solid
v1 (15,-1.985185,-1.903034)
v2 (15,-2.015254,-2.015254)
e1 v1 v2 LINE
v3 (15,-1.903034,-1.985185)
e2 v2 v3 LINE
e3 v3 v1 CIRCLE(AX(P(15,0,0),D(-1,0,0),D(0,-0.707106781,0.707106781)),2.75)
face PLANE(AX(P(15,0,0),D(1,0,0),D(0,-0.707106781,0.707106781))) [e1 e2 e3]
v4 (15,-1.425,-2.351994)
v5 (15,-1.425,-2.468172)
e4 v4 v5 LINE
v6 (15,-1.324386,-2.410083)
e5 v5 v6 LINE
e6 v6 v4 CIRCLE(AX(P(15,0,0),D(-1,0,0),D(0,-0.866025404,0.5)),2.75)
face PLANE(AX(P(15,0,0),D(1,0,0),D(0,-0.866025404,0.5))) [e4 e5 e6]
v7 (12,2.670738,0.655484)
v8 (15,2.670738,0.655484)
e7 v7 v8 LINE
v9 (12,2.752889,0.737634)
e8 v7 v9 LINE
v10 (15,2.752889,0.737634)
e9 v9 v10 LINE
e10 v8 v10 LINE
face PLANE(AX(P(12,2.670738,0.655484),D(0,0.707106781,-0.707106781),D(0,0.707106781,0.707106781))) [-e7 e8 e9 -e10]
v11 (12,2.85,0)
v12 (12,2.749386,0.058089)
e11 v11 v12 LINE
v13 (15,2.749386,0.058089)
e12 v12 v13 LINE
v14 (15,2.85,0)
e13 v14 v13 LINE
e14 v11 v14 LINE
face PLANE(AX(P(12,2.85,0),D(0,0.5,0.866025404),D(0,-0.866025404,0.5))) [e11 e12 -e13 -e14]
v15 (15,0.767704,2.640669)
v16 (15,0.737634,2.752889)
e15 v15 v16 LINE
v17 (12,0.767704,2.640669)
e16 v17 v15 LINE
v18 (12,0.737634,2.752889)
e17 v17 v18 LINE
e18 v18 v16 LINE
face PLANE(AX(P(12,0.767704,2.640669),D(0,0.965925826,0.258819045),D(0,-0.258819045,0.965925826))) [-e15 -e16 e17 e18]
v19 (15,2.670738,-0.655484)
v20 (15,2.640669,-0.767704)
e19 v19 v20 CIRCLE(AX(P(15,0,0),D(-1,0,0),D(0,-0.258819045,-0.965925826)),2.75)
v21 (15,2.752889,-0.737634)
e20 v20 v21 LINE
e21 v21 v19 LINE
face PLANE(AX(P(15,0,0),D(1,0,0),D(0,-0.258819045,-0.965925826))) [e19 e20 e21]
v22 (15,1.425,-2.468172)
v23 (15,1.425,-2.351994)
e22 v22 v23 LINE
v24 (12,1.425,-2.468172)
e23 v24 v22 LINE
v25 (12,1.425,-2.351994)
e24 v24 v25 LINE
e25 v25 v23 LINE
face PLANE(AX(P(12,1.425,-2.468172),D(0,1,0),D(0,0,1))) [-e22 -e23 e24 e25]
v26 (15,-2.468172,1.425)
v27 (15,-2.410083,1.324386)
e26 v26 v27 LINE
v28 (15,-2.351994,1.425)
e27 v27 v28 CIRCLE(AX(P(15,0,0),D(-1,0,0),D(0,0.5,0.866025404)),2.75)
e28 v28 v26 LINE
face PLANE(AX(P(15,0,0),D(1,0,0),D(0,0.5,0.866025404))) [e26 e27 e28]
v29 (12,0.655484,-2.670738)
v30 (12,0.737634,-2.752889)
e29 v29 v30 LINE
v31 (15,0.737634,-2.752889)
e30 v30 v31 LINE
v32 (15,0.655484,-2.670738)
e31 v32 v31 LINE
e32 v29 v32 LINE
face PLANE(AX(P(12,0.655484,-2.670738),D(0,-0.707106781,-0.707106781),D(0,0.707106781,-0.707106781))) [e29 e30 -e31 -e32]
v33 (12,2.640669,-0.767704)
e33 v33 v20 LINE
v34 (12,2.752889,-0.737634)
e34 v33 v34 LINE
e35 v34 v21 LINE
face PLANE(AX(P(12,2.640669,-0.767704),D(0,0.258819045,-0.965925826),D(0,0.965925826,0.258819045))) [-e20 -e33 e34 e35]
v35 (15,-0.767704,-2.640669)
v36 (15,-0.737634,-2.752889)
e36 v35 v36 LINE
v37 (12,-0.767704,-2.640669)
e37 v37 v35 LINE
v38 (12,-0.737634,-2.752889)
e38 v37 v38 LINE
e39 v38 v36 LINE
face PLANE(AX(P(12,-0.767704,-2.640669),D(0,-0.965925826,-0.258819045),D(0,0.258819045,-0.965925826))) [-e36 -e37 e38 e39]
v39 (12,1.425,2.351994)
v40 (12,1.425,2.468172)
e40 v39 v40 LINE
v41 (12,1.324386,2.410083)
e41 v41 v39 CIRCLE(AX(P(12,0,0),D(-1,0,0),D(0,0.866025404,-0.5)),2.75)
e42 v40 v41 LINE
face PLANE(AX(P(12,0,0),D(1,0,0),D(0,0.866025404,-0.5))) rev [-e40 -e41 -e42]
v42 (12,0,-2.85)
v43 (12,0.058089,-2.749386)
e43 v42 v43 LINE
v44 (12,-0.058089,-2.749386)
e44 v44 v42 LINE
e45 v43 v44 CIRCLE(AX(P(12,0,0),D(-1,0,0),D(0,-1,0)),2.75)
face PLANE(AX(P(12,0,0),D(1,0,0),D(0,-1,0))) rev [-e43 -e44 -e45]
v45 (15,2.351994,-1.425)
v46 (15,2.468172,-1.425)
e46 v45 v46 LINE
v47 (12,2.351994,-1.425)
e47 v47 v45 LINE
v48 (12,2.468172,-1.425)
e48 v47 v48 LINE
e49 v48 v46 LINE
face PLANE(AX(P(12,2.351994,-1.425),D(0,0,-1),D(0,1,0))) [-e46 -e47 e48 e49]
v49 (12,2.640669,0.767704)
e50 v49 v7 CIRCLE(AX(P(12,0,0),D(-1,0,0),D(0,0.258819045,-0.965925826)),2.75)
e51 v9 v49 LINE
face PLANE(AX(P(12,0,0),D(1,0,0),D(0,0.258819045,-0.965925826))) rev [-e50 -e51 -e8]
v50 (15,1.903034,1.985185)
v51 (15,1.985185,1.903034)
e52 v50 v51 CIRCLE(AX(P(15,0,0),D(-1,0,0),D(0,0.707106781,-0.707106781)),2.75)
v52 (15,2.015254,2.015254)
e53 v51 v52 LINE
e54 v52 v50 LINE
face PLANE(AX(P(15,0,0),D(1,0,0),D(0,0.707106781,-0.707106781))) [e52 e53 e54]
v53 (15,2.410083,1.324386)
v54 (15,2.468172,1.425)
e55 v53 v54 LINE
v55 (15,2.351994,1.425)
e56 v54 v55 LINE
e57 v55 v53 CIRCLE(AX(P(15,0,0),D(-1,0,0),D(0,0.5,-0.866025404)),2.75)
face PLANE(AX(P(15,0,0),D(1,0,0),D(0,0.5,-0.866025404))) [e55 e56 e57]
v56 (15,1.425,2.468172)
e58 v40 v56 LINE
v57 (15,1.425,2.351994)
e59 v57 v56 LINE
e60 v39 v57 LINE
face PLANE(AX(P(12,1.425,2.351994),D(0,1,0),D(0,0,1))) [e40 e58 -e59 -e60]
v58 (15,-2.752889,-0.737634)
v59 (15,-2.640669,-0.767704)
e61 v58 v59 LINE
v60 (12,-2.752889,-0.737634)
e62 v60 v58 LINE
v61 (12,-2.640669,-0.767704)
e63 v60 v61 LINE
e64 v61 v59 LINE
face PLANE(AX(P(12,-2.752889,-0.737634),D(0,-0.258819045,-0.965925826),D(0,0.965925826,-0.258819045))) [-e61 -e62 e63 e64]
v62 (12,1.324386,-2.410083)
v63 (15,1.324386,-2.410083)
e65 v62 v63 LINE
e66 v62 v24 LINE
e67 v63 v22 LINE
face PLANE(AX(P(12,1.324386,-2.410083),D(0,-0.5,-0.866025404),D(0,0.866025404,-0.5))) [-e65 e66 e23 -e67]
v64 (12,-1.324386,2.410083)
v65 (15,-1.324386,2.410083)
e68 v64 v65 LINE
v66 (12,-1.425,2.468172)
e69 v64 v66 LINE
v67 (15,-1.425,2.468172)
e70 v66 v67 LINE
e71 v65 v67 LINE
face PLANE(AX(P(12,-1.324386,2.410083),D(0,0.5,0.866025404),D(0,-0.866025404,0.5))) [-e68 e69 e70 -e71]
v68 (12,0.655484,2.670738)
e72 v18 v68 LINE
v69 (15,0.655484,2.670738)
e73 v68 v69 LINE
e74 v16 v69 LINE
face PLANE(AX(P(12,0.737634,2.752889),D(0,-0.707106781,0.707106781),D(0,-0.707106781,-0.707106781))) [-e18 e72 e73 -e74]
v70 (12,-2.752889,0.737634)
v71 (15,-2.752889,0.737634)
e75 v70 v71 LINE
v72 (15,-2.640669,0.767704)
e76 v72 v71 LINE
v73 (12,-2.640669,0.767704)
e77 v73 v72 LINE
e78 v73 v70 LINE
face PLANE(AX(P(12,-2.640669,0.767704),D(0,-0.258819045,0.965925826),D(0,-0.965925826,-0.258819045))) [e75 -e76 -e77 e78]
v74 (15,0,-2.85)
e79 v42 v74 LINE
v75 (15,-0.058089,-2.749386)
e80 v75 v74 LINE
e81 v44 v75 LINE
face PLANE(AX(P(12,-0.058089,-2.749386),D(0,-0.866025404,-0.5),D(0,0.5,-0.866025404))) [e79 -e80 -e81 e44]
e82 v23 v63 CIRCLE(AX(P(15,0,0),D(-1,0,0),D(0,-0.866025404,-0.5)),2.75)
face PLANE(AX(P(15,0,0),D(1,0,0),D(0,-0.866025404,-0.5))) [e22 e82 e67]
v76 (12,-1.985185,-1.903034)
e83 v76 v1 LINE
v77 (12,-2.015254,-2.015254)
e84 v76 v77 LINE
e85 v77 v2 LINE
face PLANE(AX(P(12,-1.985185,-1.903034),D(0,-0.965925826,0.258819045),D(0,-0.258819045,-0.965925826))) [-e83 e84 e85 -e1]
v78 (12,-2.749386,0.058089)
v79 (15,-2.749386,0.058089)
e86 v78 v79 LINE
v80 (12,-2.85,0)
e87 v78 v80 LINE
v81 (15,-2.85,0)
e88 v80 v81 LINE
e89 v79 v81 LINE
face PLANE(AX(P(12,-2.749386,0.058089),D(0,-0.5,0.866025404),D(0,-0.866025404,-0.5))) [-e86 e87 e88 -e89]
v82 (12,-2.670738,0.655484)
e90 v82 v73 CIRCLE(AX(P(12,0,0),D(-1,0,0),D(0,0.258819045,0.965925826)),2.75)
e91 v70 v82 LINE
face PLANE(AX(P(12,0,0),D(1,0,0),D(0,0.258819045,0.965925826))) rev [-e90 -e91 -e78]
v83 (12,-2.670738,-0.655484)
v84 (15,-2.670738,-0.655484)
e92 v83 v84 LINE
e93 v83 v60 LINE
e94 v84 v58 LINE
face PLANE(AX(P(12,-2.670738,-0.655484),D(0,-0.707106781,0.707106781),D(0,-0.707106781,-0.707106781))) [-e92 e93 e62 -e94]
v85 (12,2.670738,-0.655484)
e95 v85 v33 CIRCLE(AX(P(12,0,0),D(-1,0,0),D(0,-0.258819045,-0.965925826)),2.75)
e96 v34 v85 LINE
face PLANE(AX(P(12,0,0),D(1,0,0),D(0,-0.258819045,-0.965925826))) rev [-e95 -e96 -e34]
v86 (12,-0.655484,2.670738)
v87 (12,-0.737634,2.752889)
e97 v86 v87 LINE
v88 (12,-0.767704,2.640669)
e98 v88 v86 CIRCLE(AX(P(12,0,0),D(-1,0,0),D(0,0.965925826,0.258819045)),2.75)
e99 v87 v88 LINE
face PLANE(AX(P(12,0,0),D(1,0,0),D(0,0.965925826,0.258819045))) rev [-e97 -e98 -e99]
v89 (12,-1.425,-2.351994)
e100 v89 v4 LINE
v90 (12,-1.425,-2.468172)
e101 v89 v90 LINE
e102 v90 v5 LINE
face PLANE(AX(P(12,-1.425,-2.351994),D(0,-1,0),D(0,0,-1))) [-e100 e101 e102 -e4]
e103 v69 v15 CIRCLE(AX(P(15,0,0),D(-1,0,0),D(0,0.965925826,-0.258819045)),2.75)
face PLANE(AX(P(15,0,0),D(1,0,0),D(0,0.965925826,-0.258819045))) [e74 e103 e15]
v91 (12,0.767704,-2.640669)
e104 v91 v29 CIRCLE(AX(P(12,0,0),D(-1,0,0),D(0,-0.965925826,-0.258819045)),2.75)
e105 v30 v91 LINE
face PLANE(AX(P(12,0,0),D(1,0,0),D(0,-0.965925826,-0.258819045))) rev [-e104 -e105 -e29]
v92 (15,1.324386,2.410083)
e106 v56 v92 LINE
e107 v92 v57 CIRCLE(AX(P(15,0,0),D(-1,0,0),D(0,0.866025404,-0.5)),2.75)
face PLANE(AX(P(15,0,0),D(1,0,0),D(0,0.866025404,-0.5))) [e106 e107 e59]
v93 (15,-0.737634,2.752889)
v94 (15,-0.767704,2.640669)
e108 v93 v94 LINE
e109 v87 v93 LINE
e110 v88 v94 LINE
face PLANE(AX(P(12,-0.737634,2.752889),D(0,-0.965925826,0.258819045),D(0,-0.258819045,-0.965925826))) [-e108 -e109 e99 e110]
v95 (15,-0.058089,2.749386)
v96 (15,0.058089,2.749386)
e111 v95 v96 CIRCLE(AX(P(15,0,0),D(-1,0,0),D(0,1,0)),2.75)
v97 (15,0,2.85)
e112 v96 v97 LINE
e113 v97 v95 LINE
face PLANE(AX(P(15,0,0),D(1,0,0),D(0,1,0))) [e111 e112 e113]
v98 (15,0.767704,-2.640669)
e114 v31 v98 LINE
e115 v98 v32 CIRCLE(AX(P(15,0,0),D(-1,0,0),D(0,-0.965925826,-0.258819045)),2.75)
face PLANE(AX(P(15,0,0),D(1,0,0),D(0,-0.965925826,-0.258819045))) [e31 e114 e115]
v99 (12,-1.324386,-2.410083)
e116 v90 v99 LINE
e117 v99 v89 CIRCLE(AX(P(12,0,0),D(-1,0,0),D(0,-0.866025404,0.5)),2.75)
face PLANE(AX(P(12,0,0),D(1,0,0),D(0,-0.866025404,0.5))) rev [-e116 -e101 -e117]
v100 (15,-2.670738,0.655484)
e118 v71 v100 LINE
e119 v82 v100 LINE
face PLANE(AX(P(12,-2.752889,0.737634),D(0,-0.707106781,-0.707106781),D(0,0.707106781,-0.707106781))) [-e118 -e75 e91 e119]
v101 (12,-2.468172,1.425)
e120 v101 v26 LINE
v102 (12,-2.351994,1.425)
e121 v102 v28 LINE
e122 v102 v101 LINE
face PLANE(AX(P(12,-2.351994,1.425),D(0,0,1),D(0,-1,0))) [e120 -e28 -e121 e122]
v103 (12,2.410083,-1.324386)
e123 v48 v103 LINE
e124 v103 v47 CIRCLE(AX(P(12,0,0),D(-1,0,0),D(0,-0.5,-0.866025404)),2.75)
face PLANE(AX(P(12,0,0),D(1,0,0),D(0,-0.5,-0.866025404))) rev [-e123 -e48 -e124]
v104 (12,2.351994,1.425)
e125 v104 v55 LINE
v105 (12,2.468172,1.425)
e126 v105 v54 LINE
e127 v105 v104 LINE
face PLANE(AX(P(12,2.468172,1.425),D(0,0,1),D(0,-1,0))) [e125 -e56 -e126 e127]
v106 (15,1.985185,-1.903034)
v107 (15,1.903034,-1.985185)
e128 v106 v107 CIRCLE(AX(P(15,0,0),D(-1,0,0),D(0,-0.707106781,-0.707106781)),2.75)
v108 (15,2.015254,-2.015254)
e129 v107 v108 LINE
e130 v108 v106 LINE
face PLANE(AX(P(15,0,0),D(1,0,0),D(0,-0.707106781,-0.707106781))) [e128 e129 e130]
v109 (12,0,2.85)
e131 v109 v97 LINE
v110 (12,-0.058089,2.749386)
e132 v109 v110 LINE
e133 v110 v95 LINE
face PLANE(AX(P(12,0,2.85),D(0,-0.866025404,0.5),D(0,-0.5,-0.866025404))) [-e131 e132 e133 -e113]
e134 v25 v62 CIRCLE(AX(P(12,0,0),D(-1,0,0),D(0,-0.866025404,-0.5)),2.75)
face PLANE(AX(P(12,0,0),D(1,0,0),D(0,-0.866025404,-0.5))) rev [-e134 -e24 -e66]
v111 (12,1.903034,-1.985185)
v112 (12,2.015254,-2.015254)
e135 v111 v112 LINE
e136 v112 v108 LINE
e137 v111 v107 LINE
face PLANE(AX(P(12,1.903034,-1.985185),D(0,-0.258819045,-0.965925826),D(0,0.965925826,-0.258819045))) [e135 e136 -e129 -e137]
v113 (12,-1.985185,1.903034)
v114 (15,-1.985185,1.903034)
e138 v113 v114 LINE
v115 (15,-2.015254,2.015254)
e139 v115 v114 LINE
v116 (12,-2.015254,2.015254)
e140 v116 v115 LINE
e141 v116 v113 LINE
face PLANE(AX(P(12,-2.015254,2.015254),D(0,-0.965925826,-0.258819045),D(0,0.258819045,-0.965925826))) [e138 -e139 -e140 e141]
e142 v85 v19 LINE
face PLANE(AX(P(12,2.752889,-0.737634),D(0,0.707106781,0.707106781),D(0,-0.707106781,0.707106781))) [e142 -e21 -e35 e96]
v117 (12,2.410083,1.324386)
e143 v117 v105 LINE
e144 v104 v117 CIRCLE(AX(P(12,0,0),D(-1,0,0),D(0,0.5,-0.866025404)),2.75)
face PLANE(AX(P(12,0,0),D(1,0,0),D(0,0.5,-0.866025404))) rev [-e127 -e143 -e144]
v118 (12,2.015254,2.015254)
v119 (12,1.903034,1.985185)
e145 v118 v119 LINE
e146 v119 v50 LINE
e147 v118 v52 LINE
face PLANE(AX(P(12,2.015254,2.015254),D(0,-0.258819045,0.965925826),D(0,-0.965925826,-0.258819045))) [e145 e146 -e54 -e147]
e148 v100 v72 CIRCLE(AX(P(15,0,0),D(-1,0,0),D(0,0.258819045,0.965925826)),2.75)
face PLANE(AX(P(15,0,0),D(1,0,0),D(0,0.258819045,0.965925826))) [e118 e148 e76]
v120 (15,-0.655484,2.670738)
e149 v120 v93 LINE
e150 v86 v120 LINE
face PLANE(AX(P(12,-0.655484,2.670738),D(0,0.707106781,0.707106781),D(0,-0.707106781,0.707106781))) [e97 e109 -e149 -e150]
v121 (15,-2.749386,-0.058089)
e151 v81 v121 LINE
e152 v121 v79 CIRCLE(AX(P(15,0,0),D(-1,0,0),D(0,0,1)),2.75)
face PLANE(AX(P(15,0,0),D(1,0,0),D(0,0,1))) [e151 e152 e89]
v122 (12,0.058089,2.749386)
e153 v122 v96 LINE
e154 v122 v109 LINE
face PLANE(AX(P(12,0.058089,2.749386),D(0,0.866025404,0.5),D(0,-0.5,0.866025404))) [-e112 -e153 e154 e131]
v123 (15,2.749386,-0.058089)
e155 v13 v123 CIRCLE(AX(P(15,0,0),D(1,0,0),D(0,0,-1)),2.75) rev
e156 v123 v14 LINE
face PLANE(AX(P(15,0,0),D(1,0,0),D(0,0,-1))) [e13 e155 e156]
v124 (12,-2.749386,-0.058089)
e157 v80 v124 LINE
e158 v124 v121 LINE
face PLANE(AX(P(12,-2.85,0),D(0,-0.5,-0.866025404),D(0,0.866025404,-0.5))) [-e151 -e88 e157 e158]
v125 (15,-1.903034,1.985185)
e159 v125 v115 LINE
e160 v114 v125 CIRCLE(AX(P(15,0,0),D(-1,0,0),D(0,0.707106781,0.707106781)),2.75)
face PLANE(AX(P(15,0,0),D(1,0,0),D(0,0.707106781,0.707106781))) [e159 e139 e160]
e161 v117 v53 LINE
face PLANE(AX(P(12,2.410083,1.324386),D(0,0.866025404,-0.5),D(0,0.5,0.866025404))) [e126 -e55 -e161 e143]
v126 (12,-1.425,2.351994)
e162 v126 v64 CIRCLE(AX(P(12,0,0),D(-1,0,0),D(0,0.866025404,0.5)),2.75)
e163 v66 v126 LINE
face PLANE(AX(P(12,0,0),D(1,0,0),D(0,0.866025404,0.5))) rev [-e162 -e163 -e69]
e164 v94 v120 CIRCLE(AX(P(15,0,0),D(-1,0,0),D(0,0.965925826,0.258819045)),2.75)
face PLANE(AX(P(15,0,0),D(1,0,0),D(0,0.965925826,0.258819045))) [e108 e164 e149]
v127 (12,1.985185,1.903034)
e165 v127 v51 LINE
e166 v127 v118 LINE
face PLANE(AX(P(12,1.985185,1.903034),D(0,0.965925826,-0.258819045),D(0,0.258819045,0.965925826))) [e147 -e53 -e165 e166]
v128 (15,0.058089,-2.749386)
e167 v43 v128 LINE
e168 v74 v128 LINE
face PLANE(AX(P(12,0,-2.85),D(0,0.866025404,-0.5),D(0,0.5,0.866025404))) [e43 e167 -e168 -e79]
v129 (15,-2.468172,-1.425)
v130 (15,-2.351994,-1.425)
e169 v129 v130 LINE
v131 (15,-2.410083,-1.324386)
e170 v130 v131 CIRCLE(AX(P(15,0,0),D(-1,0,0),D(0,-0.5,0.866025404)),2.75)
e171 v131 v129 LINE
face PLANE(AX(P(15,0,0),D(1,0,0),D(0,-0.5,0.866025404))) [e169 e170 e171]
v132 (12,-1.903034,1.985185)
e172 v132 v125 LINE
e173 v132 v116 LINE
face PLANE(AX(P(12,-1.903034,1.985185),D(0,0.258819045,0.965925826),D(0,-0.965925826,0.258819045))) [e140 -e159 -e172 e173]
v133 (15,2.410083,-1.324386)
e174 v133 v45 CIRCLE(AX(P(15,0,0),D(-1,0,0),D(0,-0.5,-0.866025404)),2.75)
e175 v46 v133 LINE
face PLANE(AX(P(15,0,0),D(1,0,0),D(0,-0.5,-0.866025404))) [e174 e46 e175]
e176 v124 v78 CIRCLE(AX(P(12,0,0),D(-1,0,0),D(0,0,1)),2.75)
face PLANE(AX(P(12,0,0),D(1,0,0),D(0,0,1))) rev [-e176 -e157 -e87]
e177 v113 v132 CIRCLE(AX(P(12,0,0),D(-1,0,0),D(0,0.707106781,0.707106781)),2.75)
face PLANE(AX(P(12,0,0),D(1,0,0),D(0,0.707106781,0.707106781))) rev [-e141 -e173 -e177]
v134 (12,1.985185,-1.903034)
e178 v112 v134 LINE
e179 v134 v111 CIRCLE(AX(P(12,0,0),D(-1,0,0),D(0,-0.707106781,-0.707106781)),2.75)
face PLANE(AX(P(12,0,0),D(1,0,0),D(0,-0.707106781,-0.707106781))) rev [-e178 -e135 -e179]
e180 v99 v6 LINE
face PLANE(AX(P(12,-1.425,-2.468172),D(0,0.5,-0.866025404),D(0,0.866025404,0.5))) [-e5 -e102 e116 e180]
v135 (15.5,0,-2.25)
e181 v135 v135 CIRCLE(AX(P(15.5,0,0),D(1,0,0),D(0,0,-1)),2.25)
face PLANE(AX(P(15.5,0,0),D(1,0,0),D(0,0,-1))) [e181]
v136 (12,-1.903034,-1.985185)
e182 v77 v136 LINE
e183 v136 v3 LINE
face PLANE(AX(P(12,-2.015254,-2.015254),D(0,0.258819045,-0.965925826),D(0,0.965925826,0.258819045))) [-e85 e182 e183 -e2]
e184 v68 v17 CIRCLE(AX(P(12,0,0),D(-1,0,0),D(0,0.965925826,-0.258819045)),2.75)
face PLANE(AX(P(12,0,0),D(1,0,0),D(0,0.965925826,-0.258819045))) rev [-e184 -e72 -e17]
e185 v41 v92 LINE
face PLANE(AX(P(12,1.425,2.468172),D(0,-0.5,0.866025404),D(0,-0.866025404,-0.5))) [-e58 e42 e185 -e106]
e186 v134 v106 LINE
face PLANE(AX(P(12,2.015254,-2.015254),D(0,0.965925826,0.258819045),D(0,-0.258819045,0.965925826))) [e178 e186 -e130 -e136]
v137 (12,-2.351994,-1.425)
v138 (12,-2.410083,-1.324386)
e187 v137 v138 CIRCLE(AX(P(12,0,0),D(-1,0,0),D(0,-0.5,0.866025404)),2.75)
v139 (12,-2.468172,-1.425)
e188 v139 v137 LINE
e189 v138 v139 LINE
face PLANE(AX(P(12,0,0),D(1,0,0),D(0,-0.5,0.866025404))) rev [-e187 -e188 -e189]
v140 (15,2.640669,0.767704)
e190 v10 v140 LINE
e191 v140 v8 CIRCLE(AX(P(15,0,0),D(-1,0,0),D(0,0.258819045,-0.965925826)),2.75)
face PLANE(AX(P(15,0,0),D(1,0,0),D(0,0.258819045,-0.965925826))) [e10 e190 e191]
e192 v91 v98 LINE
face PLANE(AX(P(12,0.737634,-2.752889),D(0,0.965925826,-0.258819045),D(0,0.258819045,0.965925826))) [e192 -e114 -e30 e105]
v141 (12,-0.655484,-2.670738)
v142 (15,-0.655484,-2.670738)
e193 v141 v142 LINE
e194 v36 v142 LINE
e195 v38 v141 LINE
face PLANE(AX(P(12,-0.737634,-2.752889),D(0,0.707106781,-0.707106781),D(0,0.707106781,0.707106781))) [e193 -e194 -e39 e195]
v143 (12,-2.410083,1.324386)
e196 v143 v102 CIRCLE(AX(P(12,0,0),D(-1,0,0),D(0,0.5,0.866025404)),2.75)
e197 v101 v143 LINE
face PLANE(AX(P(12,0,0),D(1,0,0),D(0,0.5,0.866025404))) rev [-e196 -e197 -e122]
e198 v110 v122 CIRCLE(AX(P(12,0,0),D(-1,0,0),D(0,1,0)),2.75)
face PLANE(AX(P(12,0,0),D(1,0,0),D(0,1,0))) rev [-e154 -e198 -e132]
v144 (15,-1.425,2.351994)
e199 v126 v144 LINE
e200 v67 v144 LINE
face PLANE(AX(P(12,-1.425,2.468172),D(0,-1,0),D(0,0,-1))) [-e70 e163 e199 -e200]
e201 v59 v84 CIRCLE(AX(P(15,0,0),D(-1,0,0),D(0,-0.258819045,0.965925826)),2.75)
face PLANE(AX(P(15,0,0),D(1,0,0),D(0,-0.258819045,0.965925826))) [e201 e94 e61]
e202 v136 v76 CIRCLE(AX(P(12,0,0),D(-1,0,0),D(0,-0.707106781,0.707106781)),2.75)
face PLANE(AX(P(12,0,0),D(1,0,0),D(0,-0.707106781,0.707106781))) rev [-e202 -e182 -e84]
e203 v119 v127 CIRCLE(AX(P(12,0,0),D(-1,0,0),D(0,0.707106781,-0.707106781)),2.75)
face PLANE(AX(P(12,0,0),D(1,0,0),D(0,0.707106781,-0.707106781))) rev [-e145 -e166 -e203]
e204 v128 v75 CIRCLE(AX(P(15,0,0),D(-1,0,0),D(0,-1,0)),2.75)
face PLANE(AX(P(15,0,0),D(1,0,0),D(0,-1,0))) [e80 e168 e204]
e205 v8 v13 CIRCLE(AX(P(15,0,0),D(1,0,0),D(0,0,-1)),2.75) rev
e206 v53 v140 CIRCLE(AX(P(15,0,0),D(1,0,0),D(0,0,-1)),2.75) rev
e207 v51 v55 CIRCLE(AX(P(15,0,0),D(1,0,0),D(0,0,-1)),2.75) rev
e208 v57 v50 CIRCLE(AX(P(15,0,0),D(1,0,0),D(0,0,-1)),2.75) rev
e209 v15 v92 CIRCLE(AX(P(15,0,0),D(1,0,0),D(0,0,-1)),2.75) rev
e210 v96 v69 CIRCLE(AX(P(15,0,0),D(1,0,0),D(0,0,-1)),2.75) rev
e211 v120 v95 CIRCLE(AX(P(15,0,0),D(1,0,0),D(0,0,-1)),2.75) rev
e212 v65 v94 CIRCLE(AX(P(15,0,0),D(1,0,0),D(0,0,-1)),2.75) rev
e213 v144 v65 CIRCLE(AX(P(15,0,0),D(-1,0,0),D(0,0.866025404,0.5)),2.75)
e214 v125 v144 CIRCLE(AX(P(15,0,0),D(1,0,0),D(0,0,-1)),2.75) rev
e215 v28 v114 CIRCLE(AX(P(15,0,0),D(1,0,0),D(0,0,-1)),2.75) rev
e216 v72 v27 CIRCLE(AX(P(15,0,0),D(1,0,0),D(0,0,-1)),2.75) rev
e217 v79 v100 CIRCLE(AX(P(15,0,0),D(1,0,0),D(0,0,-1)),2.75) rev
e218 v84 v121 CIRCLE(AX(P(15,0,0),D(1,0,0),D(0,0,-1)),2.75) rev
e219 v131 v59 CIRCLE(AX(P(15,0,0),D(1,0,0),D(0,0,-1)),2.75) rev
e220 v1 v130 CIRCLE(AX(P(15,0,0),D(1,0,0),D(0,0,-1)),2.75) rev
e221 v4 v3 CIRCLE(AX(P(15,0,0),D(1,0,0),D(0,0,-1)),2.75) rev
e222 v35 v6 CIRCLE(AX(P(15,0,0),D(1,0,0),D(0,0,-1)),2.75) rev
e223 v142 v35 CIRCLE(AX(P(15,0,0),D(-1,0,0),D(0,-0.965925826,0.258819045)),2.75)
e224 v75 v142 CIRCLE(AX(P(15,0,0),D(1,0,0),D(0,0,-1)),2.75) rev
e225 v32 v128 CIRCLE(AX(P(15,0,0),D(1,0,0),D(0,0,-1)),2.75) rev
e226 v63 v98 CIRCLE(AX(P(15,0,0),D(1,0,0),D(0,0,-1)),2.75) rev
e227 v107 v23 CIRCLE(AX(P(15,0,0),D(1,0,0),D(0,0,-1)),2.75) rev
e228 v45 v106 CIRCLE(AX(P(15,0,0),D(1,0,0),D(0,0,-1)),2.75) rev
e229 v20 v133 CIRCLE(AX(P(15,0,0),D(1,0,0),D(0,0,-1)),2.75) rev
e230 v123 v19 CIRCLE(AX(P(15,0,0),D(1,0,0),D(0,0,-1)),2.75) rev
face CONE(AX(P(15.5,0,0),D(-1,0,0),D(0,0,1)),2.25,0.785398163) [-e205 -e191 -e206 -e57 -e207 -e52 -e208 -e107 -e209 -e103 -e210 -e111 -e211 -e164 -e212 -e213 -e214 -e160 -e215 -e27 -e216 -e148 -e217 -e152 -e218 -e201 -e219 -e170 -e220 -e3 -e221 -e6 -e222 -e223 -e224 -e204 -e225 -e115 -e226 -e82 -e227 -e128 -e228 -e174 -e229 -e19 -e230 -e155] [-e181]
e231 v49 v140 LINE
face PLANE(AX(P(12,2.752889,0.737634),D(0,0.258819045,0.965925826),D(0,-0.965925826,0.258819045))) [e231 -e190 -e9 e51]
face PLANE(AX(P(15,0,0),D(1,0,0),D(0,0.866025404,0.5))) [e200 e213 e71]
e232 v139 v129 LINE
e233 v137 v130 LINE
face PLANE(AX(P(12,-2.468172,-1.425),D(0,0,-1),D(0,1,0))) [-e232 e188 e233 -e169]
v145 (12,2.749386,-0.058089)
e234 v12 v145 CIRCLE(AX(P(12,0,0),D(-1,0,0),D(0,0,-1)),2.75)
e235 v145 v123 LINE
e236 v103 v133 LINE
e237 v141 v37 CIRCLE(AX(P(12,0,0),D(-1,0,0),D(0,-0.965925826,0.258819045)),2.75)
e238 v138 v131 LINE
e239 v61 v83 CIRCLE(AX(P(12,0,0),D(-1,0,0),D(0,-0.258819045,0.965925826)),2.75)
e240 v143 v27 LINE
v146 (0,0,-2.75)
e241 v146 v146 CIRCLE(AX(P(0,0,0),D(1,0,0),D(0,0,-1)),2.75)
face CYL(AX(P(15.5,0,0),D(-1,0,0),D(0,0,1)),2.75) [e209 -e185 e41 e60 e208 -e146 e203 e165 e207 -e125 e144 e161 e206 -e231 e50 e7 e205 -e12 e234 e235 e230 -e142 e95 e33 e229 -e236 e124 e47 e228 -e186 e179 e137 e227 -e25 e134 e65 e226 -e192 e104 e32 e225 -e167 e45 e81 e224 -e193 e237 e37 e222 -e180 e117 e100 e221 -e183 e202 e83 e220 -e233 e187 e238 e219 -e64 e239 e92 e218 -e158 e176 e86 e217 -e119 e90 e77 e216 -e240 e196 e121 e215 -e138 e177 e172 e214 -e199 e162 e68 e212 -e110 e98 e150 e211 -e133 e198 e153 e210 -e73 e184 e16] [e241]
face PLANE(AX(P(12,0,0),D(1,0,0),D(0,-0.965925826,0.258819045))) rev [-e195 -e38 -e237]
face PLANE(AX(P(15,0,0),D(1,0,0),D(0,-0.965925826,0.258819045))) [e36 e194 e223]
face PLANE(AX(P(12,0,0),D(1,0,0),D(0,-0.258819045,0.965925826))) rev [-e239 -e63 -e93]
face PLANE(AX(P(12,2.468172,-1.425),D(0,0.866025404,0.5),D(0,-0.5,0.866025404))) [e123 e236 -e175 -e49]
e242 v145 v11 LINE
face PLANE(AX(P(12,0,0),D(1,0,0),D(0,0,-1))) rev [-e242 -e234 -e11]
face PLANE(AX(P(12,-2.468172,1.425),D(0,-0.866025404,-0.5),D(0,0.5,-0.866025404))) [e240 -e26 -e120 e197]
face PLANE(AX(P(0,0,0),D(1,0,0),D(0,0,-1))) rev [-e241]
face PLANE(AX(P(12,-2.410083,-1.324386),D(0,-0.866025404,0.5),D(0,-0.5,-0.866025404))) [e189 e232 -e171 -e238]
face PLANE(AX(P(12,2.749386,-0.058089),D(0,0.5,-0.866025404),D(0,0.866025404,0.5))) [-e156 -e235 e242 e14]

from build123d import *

# Parameters (mm, degrees)
SKETCH1_R           = 2.75
BOSS_EXTRUDE1_DEPTH = 15.5
CHAMFER1_SIZE       = 0.5
BOSS_EXTRUDE2_START = -3
BOSS_EXTRUDE2_DEPTH = 3
CIRPATTERN1_START   = 12
CIRPATTERN1_DEPTH   = 3


# Read off the part's stored shape, not the designer's step: CirPattern1
with BuildPart() as part:
    # Sketch1 → Boss-Extrude1 (new body)
    with BuildSketch(Plane(origin=(0, 0, 0), x_dir=(0, 0, -1), z_dir=(1, 0, 0))):
        Circle(SKETCH1_R)
    extrude(amount=BOSS_EXTRUDE1_DEPTH)

    # Chamfer1
    chamfer1_edges = [part.edges().sort_by_distance(p)[0] for p in [
        (15.5, 0, 2.75),
    ]]
    chamfer(chamfer1_edges, length=CHAMFER1_SIZE)

    # Sketch2 → Boss-Extrude2 (add)
    with BuildSketch(Plane(origin=(15, 0, 0), x_dir=(0, 0, -1), z_dir=(1, 0, 0)).offset(BOSS_EXTRUDE2_START)):
        with BuildLine():
            Line((0, 2.85), (-0.058089283, 2.749386411))
            ThreePointArc((-0.058089283, 2.749386411), (0, 2.75), (0.058089283, 2.749386411))
            Line((0.058089283, 2.749386411), (0, 2.85))
        make_face()
    extrude(amount=BOSS_EXTRUDE2_DEPTH)

    # CirPattern1 outline → CirPattern1 (add)
    with BuildSketch(Plane.YZ.offset(CIRPATTERN1_START)):
        with BuildLine():
            Line((-1.425, -2.351993835), (-1.425, -2.468172401))
            Line((-1.425, -2.468172401), (-1.324386411, -2.410083118))
            ThreePointArc((-1.324386411, -2.410083118), (-1.375, -2.38156986), (-1.425, -2.351993835))
        make_face()
        with BuildLine():
            ThreePointArc((-0.655483627, -2.670737953), (-0.711752374, -2.656296022), (-0.767703504, -2.640668728))
            Line((-0.767703504, -2.640668728), (-0.737634279, -2.752888605))
            Line((-0.737634279, -2.752888605), (-0.655483627, -2.670737953))
        make_face()
        with BuildLine():
            Line((-2.015254326, -2.015254326), (-1.903034449, -1.985185101))
            ThreePointArc((-1.903034449, -1.985185101), (-1.944543648, -1.944543648), (-1.985185101, -1.903034449))
            Line((-1.985185101, -1.903034449), (-2.015254326, -2.015254326))
        make_face()
        with BuildLine():
            ThreePointArc((0.058089283, -2.749386411), (0, -2.75), (-0.058089283, -2.749386411))
            Line((-0.058089283, -2.749386411), (0, -2.85))
            Line((0, -2.85), (0.058089283, -2.749386411))
        make_face()
        with BuildLine():
            Line((-2.468172401, -1.425), (-2.351993835, -1.425))
            ThreePointArc((-2.351993835, -1.425), (-2.38156986, -1.375), (-2.410083118, -1.324386411))
            Line((-2.410083118, -1.324386411), (-2.468172401, -1.425))
        make_face()
        with BuildLine():
            ThreePointArc((0.767703504, -2.640668728), (0.711752374, -2.656296022), (0.655483627, -2.670737953))
            Line((0.655483627, -2.670737953), (0.737634279, -2.752888605))
            Line((0.737634279, -2.752888605), (0.767703504, -2.640668728))
        make_face()
        with BuildLine():
            Line((-2.752888605, -0.737634279), (-2.640668728, -0.767703504))
            ThreePointArc((-2.640668728, -0.767703504), (-2.656296022, -0.711752374), (-2.670737953, -0.655483627))
            Line((-2.670737953, -0.655483627), (-2.752888605, -0.737634279))
        make_face()
        with BuildLine():
            ThreePointArc((1.425, -2.351993835), (1.375, -2.38156986), (1.324386411, -2.410083118))
            Line((1.324386411, -2.410083118), (1.425, -2.468172401))
            Line((1.425, -2.468172401), (1.425, -2.351993835))
        make_face()
        with BuildLine():
            Line((-2.85, 0), (-2.749386411, -0.058089283))
            ThreePointArc((-2.749386411, -0.058089283), (-2.75, 0), (-2.749386411, 0.058089283))
            Line((-2.749386411, 0.058089283), (-2.85, 0))
        make_face()
        with BuildLine():
            ThreePointArc((1.985185101, -1.903034449), (1.944543648, -1.944543648), (1.903034449, -1.985185101))
            Line((1.903034449, -1.985185101), (2.015254326, -2.015254326))
            Line((2.015254326, -2.015254326), (1.985185101, -1.903034449))
        make_face()
        with BuildLine():
            Line((-2.752888605, 0.737634279), (-2.670737953, 0.655483627))
            ThreePointArc((-2.670737953, 0.655483627), (-2.656296022, 0.711752374), (-2.640668728, 0.767703504))
            Line((-2.640668728, 0.767703504), (-2.752888605, 0.737634279))
        make_face()
        with BuildLine():
            ThreePointArc((2.410083118, -1.324386411), (2.38156986, -1.375), (2.351993835, -1.425))
            Line((2.351993835, -1.425), (2.468172401, -1.425))
            Line((2.468172401, -1.425), (2.410083118, -1.324386411))
        make_face()
        with BuildLine():
            Line((-2.468172401, 1.425), (-2.410083118, 1.324386411))
            ThreePointArc((-2.410083118, 1.324386411), (-2.38156986, 1.375), (-2.351993835, 1.425))
            Line((-2.351993835, 1.425), (-2.468172401, 1.425))
        make_face()
        with BuildLine():
            ThreePointArc((2.670737953, -0.655483627), (2.656296022, -0.711752374), (2.640668728, -0.767703504))
            Line((2.640668728, -0.767703504), (2.752888605, -0.737634279))
            Line((2.752888605, -0.737634279), (2.670737953, -0.655483627))
        make_face()
        with BuildLine():
            Line((-2.015254326, 2.015254326), (-1.985185101, 1.903034449))
            ThreePointArc((-1.985185101, 1.903034449), (-1.944543648, 1.944543648), (-1.903034449, 1.985185101))
            Line((-1.903034449, 1.985185101), (-2.015254326, 2.015254326))
        make_face()
        with BuildLine():
            Line((-1.425, 2.468172401), (-1.425, 2.351993835))
            ThreePointArc((-1.425, 2.351993835), (-1.375, 2.38156986), (-1.324386411, 2.410083118))
            Line((-1.324386411, 2.410083118), (-1.425, 2.468172401))
        make_face()
        with BuildLine():
            ThreePointArc((2.640668728, 0.767703504), (2.656296022, 0.711752374), (2.670737953, 0.655483627))
            Line((2.670737953, 0.655483627), (2.752888605, 0.737634279))
            Line((2.752888605, 0.737634279), (2.640668728, 0.767703504))
        make_face()
        with BuildLine():
            Line((-0.737634279, 2.752888605), (-0.767703504, 2.640668728))
            ThreePointArc((-0.767703504, 2.640668728), (-0.711752374, 2.656296022), (-0.655483627, 2.670737953))
            Line((-0.655483627, 2.670737953), (-0.737634279, 2.752888605))
        make_face()
        with BuildLine():
            ThreePointArc((2.351993835, 1.425), (2.38156986, 1.375), (2.410083118, 1.324386411))
            Line((2.410083118, 1.324386411), (2.468172401, 1.425))
            Line((2.468172401, 1.425), (2.351993835, 1.425))
        make_face()
        with BuildLine():
            Line((0, 2.85), (-0.058089283, 2.749386411))
            ThreePointArc((-0.058089283, 2.749386411), (0, 2.75), (0.058089283, 2.749386411))
            Line((0.058089283, 2.749386411), (0, 2.85))
        make_face()
        with BuildLine():
            ThreePointArc((1.903034449, 1.985185101), (1.944543648, 1.944543648), (1.985185101, 1.903034449))
            Line((1.985185101, 1.903034449), (2.015254326, 2.015254326))
            Line((2.015254326, 2.015254326), (1.903034449, 1.985185101))
        make_face()
        with BuildLine():
            Line((0.737634279, 2.752888605), (0.655483627, 2.670737953))
            ThreePointArc((0.655483627, 2.670737953), (0.711752374, 2.656296022), (0.767703504, 2.640668728))
            Line((0.767703504, 2.640668728), (0.737634279, 2.752888605))
        make_face()
        with BuildLine():
            ThreePointArc((1.324386411, 2.410083118), (1.375, 2.38156986), (1.425, 2.351993835))
            Line((1.425, 2.351993835), (1.425, 2.468172401))
            Line((1.425, 2.468172401), (1.324386411, 2.410083118))
        make_face()
    extrude(amount=CIRPATTERN1_DEPTH)


solid = part.part
